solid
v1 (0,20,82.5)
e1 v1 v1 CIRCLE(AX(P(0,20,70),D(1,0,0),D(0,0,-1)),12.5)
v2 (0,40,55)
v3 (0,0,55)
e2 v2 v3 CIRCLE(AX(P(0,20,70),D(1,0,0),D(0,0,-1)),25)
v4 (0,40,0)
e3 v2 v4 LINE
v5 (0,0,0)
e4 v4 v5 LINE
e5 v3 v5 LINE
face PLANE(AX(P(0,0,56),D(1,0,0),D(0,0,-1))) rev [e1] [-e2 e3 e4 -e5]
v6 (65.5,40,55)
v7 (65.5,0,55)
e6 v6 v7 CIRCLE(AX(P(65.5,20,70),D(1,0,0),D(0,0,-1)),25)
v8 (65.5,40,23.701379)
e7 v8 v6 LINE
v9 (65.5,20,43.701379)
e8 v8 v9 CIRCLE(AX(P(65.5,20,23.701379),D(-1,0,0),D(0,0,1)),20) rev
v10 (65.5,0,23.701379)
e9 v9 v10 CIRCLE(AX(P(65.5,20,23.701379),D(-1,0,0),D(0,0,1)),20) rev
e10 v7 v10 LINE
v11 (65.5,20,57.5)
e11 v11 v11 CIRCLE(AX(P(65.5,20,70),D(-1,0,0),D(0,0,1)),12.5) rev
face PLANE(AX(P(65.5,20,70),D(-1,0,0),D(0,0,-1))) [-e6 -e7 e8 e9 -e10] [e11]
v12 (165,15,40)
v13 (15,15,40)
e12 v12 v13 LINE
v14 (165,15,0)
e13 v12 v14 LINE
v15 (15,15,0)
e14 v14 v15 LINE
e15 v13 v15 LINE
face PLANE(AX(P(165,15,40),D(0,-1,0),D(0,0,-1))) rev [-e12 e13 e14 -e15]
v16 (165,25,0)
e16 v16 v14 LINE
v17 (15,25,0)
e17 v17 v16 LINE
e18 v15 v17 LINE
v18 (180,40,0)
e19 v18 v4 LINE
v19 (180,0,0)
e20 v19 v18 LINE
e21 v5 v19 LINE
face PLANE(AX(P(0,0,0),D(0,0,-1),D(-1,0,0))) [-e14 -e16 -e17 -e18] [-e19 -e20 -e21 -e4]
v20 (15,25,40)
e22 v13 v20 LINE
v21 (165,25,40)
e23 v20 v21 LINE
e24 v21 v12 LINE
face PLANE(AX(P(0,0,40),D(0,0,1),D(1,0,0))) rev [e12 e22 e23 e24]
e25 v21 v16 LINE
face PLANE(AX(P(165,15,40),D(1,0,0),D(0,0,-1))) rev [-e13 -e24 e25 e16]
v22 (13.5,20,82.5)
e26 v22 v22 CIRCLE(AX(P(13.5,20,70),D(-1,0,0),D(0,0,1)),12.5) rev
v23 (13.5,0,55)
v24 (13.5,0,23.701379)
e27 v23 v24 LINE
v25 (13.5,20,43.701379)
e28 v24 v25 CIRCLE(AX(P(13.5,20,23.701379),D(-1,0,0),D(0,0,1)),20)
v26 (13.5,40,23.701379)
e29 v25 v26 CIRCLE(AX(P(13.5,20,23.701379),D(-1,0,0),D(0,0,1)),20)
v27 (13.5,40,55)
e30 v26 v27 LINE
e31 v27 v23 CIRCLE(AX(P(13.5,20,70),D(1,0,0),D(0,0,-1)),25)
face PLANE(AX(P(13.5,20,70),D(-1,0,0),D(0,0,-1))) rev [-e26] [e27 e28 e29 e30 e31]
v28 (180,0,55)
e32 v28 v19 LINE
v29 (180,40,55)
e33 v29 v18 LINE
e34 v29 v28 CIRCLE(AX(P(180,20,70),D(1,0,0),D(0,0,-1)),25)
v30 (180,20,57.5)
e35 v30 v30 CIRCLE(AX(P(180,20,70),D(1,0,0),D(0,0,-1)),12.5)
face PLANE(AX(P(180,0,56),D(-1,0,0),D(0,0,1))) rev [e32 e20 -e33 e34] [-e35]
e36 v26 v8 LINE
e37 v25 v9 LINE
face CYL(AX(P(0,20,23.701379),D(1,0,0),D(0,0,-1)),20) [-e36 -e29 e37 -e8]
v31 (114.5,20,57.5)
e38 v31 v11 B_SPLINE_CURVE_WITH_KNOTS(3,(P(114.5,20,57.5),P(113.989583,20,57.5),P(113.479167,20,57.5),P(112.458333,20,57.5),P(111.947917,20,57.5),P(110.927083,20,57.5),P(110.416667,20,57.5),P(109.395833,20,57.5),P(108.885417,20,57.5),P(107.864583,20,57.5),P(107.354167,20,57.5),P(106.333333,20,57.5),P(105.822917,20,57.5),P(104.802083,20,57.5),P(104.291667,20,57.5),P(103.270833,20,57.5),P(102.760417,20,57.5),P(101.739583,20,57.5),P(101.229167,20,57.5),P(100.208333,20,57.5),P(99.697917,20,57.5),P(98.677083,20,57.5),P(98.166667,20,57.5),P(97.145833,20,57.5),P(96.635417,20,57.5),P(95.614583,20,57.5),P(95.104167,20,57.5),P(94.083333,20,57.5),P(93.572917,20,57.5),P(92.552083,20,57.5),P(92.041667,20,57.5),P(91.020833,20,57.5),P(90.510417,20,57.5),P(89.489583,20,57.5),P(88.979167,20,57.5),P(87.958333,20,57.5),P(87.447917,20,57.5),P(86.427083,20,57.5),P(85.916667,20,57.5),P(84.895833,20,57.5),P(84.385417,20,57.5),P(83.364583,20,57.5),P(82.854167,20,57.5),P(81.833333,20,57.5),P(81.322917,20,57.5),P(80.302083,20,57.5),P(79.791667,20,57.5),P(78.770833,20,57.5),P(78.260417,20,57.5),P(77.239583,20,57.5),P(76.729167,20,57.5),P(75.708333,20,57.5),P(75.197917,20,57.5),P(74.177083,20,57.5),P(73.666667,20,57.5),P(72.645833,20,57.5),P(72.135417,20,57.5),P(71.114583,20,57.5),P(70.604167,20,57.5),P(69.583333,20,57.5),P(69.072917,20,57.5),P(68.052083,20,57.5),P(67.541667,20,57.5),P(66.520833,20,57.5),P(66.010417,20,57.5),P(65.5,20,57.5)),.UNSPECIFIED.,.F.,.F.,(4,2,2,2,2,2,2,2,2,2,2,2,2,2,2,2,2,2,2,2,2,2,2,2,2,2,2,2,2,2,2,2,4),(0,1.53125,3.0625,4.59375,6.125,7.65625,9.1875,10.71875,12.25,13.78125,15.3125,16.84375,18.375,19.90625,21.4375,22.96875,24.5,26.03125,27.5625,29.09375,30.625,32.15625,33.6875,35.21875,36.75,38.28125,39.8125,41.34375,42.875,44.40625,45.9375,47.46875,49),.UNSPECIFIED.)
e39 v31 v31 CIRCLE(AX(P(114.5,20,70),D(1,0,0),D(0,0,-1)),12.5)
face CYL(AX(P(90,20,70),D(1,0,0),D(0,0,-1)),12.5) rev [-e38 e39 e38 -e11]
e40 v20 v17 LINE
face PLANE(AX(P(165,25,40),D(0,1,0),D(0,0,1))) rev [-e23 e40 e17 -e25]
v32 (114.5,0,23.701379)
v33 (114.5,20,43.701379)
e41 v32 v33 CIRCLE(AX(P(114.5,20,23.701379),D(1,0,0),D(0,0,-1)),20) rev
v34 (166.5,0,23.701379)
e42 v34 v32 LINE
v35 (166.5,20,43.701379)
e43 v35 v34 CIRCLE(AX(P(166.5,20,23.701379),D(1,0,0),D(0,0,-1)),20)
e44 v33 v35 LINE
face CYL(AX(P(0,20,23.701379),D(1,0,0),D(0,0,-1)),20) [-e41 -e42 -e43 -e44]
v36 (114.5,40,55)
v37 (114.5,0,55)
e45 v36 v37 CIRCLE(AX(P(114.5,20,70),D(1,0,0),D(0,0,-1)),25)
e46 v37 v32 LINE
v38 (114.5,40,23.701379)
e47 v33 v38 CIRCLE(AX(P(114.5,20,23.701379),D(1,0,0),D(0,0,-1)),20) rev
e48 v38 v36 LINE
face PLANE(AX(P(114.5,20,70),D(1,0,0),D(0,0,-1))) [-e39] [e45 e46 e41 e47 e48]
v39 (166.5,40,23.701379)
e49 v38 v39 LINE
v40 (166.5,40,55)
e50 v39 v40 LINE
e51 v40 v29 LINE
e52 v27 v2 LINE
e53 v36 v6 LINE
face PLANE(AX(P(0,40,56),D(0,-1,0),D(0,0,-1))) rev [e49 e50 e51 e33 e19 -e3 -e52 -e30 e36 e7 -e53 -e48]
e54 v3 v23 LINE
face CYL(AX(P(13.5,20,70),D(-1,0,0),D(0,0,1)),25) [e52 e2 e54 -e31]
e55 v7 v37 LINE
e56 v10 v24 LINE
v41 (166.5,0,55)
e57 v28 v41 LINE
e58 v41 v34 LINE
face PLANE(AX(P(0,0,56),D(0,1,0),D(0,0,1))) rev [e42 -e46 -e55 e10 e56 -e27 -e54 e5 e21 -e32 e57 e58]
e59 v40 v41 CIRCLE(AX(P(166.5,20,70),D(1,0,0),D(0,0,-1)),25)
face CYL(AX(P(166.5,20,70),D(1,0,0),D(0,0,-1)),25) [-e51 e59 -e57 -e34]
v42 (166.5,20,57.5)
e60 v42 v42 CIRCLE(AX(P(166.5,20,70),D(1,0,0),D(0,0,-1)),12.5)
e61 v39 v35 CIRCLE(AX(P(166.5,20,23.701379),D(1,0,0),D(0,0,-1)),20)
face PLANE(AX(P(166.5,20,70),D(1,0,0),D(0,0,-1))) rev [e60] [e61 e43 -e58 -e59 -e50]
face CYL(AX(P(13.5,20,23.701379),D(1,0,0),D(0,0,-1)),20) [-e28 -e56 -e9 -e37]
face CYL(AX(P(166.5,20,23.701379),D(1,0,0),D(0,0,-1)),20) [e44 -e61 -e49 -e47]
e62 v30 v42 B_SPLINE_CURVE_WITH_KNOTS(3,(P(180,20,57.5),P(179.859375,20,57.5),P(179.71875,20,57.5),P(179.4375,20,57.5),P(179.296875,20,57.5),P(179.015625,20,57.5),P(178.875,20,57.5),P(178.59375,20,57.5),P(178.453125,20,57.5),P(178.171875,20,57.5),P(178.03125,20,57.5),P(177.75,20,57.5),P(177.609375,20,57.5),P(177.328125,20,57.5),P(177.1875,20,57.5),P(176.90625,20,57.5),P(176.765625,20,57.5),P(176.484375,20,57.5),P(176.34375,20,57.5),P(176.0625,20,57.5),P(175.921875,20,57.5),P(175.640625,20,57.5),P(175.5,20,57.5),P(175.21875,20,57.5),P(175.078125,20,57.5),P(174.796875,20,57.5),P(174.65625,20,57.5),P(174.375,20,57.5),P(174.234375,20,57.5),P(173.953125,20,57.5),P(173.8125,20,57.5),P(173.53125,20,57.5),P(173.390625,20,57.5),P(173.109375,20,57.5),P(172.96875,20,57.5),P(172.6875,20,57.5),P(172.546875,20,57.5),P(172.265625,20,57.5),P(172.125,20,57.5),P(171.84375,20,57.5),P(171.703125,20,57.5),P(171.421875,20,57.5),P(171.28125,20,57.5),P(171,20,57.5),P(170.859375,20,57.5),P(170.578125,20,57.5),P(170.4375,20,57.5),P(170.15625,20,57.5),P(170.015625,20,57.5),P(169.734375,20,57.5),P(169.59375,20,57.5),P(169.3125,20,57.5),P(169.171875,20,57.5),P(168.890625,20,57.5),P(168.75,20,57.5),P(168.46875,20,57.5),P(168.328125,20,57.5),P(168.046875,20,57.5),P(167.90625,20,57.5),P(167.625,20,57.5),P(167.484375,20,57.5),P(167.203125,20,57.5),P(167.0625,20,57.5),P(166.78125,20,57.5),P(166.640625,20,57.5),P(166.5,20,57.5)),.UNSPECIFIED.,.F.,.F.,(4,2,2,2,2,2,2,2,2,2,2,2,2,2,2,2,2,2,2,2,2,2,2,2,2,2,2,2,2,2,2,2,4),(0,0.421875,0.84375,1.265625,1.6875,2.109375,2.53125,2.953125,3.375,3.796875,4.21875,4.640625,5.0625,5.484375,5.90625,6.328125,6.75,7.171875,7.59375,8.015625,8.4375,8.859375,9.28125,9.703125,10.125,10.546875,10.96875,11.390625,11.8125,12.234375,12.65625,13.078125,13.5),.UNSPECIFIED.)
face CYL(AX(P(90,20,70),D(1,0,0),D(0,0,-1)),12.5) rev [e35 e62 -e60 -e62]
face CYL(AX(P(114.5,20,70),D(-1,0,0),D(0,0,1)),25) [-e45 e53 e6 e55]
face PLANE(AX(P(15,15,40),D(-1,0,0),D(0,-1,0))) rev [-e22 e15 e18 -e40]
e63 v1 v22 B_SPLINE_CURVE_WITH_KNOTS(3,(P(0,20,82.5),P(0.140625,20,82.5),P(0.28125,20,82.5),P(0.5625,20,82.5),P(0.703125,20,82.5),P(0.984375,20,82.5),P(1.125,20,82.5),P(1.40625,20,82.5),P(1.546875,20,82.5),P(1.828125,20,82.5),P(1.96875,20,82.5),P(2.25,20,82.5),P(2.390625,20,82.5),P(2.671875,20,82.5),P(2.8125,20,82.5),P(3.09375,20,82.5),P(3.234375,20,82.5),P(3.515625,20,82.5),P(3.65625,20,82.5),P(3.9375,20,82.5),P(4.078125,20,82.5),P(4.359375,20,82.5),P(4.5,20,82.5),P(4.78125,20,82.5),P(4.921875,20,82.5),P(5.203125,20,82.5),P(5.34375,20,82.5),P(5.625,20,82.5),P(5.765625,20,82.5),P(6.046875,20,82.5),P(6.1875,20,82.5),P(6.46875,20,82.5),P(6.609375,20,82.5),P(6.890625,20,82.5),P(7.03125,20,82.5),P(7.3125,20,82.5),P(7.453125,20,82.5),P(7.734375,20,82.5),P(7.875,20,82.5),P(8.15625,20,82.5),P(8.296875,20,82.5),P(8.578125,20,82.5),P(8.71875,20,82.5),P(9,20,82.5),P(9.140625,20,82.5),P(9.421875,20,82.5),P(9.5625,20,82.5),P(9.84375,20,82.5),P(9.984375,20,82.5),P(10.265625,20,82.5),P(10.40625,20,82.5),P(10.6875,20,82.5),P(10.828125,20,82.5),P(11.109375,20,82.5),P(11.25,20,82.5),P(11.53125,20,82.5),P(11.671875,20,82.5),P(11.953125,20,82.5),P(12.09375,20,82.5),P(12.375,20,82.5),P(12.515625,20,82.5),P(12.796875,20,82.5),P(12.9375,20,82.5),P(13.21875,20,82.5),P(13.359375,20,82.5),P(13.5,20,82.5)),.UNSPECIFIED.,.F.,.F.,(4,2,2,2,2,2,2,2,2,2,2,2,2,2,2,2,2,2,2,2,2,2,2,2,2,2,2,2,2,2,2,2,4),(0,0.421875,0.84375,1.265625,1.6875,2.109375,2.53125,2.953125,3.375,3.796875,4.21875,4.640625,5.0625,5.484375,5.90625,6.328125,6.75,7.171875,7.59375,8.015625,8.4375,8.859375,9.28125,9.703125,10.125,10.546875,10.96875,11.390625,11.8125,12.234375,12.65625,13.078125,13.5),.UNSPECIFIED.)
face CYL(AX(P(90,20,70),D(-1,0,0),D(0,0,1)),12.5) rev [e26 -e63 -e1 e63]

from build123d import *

# Parameters (mm, degrees)
SKETCH1_W           = 180
SKETCH1_H           = 40
BOSS_EXTRUDE1_DEPTH = 56
SKETCH2_W           = 150
SKETCH2_H           = 10
CUT_EXTRUDE1_DEPTH  = 40
SKETCH3_R           = 25
BOSS_EXTRUDE2_DEPTH = 24.5
BOSS_EXTRUDE3_START = -13.5
SKETCH4_R           = 25
BOSS_EXTRUDE3_DEPTH = 13.5
SKETCH6_R           = 12.5
CUT_EXTRUDE2_DEPTH  = 90
SKETCH10_W          = 11.29862099
SKETCH10_H          = 40
CUT_EXTRUDE4_DEPTH  = 52
SKETCH11_W          = 52
SKETCH11_H          = 40
CUT_EXTRUDE5_DEPTH  = 2
FILLET1_R           = 20


with BuildPart() as part:
    # Sketch1 → Boss-Extrude1 (new body)
    with BuildSketch(Plane.XY):
        with Locations((90, 20)):
            Rectangle(SKETCH1_W, SKETCH1_H)
    extrude(amount=BOSS_EXTRUDE1_DEPTH)

    # Sketch2 → Cut-Extrude1 (cut)
    with BuildSketch(Plane(origin=(0, 0, 0), x_dir=(-1, 0, 0), z_dir=(0, 0, -1))):
        with Locations((-90, 20)):
            Rectangle(SKETCH2_W, SKETCH2_H)
    extrude(amount=-CUT_EXTRUDE1_DEPTH, mode=Mode.SUBTRACT)

    # Sketch3 → Boss-Extrude2 (add)
    with BuildSketch(Plane(origin=(90, 0, 0), x_dir=(0, 0, -1), z_dir=(1, 0, 0))):
        with Locations((-70, 20)):
            Circle(SKETCH3_R)
    boss_extrude2 = extrude(amount=BOSS_EXTRUDE2_DEPTH)

    # Sketch4 → Boss-Extrude3 (add)
    with BuildSketch(Plane(origin=(180, 0, 0), x_dir=(0, 0, -1), z_dir=(1, 0, 0)).offset(BOSS_EXTRUDE3_START)):
        with Locations((-70, 20)):
            Circle(SKETCH4_R)
    boss_extrude3 = extrude(amount=BOSS_EXTRUDE3_DEPTH)

    # Sketch6 → Cut-Extrude2 (cut)
    with BuildSketch(Plane(origin=(180, 0, 0), x_dir=(0, 0, -1), z_dir=(1, 0, 0))):
        with Locations((-70, 20)):
            Circle(SKETCH6_R)
    cut_extrude2 = extrude(amount=-CUT_EXTRUDE2_DEPTH, mode=Mode.SUBTRACT)

    # Mirror1: Boss-Extrude2, Boss-Extrude3, Cut-Extrude2 across plane
    add(boss_extrude2.mirror(Plane(origin=(90, 0, 0), x_dir=(0, 0, 1), z_dir=(1, 0, 0))))
    add(boss_extrude3.mirror(Plane(origin=(90, 0, 0), x_dir=(0, 0, 1), z_dir=(1, 0, 0))))
    add(cut_extrude2.mirror(Plane(origin=(90, 0, 0), x_dir=(0, 0, 1), z_dir=(1, 0, 0))), mode=Mode.SUBTRACT)

    # Sketch10 → Cut-Extrude4 (cut)
    with BuildSketch(Plane(origin=(114.5, 0, 0), x_dir=(0, 0, -1), z_dir=(1, 0, 0))):
        with Locations((-49.350689505, 20)):
            Rectangle(SKETCH10_W, SKETCH10_H)
    cut_extrude4 = extrude(amount=CUT_EXTRUDE4_DEPTH, mode=Mode.SUBTRACT)

    # Mirror3: Cut-Extrude4 across plane
    add(cut_extrude4.mirror(Plane(origin=(90, 0, 0), x_dir=(0, 0, 1), z_dir=(1, 0, 0))), mode=Mode.SUBTRACT)

    # Sketch11 → Cut-Extrude5 (cut)
    with BuildSketch(Plane.XY.offset(56)):
        with Locations((140.5, 20)):
            Rectangle(SKETCH11_W, SKETCH11_H)
    cut_extrude5 = extrude(amount=-CUT_EXTRUDE5_DEPTH, mode=Mode.SUBTRACT)

    # Mirror4: Cut-Extrude5 across plane
    add(cut_extrude5.mirror(Plane(origin=(90, 0, 0), x_dir=(0, 0, 1), z_dir=(1, 0, 0))), mode=Mode.SUBTRACT)

    # Fillet1
    fillet1_edges = [part.edges().sort_by_distance(p)[0] for p in [
        (39.5, 40, 43.70137901),
        (39.5, 0, 43.70137901),
        (140.5, 40, 43.70137901),
        (140.5, 0, 43.70137901),
    ]]
    fillet(fillet1_edges, radius=FILLET1_R - 0.0001)  # a hair under: the kernel refuses the full size


solid = part.part
